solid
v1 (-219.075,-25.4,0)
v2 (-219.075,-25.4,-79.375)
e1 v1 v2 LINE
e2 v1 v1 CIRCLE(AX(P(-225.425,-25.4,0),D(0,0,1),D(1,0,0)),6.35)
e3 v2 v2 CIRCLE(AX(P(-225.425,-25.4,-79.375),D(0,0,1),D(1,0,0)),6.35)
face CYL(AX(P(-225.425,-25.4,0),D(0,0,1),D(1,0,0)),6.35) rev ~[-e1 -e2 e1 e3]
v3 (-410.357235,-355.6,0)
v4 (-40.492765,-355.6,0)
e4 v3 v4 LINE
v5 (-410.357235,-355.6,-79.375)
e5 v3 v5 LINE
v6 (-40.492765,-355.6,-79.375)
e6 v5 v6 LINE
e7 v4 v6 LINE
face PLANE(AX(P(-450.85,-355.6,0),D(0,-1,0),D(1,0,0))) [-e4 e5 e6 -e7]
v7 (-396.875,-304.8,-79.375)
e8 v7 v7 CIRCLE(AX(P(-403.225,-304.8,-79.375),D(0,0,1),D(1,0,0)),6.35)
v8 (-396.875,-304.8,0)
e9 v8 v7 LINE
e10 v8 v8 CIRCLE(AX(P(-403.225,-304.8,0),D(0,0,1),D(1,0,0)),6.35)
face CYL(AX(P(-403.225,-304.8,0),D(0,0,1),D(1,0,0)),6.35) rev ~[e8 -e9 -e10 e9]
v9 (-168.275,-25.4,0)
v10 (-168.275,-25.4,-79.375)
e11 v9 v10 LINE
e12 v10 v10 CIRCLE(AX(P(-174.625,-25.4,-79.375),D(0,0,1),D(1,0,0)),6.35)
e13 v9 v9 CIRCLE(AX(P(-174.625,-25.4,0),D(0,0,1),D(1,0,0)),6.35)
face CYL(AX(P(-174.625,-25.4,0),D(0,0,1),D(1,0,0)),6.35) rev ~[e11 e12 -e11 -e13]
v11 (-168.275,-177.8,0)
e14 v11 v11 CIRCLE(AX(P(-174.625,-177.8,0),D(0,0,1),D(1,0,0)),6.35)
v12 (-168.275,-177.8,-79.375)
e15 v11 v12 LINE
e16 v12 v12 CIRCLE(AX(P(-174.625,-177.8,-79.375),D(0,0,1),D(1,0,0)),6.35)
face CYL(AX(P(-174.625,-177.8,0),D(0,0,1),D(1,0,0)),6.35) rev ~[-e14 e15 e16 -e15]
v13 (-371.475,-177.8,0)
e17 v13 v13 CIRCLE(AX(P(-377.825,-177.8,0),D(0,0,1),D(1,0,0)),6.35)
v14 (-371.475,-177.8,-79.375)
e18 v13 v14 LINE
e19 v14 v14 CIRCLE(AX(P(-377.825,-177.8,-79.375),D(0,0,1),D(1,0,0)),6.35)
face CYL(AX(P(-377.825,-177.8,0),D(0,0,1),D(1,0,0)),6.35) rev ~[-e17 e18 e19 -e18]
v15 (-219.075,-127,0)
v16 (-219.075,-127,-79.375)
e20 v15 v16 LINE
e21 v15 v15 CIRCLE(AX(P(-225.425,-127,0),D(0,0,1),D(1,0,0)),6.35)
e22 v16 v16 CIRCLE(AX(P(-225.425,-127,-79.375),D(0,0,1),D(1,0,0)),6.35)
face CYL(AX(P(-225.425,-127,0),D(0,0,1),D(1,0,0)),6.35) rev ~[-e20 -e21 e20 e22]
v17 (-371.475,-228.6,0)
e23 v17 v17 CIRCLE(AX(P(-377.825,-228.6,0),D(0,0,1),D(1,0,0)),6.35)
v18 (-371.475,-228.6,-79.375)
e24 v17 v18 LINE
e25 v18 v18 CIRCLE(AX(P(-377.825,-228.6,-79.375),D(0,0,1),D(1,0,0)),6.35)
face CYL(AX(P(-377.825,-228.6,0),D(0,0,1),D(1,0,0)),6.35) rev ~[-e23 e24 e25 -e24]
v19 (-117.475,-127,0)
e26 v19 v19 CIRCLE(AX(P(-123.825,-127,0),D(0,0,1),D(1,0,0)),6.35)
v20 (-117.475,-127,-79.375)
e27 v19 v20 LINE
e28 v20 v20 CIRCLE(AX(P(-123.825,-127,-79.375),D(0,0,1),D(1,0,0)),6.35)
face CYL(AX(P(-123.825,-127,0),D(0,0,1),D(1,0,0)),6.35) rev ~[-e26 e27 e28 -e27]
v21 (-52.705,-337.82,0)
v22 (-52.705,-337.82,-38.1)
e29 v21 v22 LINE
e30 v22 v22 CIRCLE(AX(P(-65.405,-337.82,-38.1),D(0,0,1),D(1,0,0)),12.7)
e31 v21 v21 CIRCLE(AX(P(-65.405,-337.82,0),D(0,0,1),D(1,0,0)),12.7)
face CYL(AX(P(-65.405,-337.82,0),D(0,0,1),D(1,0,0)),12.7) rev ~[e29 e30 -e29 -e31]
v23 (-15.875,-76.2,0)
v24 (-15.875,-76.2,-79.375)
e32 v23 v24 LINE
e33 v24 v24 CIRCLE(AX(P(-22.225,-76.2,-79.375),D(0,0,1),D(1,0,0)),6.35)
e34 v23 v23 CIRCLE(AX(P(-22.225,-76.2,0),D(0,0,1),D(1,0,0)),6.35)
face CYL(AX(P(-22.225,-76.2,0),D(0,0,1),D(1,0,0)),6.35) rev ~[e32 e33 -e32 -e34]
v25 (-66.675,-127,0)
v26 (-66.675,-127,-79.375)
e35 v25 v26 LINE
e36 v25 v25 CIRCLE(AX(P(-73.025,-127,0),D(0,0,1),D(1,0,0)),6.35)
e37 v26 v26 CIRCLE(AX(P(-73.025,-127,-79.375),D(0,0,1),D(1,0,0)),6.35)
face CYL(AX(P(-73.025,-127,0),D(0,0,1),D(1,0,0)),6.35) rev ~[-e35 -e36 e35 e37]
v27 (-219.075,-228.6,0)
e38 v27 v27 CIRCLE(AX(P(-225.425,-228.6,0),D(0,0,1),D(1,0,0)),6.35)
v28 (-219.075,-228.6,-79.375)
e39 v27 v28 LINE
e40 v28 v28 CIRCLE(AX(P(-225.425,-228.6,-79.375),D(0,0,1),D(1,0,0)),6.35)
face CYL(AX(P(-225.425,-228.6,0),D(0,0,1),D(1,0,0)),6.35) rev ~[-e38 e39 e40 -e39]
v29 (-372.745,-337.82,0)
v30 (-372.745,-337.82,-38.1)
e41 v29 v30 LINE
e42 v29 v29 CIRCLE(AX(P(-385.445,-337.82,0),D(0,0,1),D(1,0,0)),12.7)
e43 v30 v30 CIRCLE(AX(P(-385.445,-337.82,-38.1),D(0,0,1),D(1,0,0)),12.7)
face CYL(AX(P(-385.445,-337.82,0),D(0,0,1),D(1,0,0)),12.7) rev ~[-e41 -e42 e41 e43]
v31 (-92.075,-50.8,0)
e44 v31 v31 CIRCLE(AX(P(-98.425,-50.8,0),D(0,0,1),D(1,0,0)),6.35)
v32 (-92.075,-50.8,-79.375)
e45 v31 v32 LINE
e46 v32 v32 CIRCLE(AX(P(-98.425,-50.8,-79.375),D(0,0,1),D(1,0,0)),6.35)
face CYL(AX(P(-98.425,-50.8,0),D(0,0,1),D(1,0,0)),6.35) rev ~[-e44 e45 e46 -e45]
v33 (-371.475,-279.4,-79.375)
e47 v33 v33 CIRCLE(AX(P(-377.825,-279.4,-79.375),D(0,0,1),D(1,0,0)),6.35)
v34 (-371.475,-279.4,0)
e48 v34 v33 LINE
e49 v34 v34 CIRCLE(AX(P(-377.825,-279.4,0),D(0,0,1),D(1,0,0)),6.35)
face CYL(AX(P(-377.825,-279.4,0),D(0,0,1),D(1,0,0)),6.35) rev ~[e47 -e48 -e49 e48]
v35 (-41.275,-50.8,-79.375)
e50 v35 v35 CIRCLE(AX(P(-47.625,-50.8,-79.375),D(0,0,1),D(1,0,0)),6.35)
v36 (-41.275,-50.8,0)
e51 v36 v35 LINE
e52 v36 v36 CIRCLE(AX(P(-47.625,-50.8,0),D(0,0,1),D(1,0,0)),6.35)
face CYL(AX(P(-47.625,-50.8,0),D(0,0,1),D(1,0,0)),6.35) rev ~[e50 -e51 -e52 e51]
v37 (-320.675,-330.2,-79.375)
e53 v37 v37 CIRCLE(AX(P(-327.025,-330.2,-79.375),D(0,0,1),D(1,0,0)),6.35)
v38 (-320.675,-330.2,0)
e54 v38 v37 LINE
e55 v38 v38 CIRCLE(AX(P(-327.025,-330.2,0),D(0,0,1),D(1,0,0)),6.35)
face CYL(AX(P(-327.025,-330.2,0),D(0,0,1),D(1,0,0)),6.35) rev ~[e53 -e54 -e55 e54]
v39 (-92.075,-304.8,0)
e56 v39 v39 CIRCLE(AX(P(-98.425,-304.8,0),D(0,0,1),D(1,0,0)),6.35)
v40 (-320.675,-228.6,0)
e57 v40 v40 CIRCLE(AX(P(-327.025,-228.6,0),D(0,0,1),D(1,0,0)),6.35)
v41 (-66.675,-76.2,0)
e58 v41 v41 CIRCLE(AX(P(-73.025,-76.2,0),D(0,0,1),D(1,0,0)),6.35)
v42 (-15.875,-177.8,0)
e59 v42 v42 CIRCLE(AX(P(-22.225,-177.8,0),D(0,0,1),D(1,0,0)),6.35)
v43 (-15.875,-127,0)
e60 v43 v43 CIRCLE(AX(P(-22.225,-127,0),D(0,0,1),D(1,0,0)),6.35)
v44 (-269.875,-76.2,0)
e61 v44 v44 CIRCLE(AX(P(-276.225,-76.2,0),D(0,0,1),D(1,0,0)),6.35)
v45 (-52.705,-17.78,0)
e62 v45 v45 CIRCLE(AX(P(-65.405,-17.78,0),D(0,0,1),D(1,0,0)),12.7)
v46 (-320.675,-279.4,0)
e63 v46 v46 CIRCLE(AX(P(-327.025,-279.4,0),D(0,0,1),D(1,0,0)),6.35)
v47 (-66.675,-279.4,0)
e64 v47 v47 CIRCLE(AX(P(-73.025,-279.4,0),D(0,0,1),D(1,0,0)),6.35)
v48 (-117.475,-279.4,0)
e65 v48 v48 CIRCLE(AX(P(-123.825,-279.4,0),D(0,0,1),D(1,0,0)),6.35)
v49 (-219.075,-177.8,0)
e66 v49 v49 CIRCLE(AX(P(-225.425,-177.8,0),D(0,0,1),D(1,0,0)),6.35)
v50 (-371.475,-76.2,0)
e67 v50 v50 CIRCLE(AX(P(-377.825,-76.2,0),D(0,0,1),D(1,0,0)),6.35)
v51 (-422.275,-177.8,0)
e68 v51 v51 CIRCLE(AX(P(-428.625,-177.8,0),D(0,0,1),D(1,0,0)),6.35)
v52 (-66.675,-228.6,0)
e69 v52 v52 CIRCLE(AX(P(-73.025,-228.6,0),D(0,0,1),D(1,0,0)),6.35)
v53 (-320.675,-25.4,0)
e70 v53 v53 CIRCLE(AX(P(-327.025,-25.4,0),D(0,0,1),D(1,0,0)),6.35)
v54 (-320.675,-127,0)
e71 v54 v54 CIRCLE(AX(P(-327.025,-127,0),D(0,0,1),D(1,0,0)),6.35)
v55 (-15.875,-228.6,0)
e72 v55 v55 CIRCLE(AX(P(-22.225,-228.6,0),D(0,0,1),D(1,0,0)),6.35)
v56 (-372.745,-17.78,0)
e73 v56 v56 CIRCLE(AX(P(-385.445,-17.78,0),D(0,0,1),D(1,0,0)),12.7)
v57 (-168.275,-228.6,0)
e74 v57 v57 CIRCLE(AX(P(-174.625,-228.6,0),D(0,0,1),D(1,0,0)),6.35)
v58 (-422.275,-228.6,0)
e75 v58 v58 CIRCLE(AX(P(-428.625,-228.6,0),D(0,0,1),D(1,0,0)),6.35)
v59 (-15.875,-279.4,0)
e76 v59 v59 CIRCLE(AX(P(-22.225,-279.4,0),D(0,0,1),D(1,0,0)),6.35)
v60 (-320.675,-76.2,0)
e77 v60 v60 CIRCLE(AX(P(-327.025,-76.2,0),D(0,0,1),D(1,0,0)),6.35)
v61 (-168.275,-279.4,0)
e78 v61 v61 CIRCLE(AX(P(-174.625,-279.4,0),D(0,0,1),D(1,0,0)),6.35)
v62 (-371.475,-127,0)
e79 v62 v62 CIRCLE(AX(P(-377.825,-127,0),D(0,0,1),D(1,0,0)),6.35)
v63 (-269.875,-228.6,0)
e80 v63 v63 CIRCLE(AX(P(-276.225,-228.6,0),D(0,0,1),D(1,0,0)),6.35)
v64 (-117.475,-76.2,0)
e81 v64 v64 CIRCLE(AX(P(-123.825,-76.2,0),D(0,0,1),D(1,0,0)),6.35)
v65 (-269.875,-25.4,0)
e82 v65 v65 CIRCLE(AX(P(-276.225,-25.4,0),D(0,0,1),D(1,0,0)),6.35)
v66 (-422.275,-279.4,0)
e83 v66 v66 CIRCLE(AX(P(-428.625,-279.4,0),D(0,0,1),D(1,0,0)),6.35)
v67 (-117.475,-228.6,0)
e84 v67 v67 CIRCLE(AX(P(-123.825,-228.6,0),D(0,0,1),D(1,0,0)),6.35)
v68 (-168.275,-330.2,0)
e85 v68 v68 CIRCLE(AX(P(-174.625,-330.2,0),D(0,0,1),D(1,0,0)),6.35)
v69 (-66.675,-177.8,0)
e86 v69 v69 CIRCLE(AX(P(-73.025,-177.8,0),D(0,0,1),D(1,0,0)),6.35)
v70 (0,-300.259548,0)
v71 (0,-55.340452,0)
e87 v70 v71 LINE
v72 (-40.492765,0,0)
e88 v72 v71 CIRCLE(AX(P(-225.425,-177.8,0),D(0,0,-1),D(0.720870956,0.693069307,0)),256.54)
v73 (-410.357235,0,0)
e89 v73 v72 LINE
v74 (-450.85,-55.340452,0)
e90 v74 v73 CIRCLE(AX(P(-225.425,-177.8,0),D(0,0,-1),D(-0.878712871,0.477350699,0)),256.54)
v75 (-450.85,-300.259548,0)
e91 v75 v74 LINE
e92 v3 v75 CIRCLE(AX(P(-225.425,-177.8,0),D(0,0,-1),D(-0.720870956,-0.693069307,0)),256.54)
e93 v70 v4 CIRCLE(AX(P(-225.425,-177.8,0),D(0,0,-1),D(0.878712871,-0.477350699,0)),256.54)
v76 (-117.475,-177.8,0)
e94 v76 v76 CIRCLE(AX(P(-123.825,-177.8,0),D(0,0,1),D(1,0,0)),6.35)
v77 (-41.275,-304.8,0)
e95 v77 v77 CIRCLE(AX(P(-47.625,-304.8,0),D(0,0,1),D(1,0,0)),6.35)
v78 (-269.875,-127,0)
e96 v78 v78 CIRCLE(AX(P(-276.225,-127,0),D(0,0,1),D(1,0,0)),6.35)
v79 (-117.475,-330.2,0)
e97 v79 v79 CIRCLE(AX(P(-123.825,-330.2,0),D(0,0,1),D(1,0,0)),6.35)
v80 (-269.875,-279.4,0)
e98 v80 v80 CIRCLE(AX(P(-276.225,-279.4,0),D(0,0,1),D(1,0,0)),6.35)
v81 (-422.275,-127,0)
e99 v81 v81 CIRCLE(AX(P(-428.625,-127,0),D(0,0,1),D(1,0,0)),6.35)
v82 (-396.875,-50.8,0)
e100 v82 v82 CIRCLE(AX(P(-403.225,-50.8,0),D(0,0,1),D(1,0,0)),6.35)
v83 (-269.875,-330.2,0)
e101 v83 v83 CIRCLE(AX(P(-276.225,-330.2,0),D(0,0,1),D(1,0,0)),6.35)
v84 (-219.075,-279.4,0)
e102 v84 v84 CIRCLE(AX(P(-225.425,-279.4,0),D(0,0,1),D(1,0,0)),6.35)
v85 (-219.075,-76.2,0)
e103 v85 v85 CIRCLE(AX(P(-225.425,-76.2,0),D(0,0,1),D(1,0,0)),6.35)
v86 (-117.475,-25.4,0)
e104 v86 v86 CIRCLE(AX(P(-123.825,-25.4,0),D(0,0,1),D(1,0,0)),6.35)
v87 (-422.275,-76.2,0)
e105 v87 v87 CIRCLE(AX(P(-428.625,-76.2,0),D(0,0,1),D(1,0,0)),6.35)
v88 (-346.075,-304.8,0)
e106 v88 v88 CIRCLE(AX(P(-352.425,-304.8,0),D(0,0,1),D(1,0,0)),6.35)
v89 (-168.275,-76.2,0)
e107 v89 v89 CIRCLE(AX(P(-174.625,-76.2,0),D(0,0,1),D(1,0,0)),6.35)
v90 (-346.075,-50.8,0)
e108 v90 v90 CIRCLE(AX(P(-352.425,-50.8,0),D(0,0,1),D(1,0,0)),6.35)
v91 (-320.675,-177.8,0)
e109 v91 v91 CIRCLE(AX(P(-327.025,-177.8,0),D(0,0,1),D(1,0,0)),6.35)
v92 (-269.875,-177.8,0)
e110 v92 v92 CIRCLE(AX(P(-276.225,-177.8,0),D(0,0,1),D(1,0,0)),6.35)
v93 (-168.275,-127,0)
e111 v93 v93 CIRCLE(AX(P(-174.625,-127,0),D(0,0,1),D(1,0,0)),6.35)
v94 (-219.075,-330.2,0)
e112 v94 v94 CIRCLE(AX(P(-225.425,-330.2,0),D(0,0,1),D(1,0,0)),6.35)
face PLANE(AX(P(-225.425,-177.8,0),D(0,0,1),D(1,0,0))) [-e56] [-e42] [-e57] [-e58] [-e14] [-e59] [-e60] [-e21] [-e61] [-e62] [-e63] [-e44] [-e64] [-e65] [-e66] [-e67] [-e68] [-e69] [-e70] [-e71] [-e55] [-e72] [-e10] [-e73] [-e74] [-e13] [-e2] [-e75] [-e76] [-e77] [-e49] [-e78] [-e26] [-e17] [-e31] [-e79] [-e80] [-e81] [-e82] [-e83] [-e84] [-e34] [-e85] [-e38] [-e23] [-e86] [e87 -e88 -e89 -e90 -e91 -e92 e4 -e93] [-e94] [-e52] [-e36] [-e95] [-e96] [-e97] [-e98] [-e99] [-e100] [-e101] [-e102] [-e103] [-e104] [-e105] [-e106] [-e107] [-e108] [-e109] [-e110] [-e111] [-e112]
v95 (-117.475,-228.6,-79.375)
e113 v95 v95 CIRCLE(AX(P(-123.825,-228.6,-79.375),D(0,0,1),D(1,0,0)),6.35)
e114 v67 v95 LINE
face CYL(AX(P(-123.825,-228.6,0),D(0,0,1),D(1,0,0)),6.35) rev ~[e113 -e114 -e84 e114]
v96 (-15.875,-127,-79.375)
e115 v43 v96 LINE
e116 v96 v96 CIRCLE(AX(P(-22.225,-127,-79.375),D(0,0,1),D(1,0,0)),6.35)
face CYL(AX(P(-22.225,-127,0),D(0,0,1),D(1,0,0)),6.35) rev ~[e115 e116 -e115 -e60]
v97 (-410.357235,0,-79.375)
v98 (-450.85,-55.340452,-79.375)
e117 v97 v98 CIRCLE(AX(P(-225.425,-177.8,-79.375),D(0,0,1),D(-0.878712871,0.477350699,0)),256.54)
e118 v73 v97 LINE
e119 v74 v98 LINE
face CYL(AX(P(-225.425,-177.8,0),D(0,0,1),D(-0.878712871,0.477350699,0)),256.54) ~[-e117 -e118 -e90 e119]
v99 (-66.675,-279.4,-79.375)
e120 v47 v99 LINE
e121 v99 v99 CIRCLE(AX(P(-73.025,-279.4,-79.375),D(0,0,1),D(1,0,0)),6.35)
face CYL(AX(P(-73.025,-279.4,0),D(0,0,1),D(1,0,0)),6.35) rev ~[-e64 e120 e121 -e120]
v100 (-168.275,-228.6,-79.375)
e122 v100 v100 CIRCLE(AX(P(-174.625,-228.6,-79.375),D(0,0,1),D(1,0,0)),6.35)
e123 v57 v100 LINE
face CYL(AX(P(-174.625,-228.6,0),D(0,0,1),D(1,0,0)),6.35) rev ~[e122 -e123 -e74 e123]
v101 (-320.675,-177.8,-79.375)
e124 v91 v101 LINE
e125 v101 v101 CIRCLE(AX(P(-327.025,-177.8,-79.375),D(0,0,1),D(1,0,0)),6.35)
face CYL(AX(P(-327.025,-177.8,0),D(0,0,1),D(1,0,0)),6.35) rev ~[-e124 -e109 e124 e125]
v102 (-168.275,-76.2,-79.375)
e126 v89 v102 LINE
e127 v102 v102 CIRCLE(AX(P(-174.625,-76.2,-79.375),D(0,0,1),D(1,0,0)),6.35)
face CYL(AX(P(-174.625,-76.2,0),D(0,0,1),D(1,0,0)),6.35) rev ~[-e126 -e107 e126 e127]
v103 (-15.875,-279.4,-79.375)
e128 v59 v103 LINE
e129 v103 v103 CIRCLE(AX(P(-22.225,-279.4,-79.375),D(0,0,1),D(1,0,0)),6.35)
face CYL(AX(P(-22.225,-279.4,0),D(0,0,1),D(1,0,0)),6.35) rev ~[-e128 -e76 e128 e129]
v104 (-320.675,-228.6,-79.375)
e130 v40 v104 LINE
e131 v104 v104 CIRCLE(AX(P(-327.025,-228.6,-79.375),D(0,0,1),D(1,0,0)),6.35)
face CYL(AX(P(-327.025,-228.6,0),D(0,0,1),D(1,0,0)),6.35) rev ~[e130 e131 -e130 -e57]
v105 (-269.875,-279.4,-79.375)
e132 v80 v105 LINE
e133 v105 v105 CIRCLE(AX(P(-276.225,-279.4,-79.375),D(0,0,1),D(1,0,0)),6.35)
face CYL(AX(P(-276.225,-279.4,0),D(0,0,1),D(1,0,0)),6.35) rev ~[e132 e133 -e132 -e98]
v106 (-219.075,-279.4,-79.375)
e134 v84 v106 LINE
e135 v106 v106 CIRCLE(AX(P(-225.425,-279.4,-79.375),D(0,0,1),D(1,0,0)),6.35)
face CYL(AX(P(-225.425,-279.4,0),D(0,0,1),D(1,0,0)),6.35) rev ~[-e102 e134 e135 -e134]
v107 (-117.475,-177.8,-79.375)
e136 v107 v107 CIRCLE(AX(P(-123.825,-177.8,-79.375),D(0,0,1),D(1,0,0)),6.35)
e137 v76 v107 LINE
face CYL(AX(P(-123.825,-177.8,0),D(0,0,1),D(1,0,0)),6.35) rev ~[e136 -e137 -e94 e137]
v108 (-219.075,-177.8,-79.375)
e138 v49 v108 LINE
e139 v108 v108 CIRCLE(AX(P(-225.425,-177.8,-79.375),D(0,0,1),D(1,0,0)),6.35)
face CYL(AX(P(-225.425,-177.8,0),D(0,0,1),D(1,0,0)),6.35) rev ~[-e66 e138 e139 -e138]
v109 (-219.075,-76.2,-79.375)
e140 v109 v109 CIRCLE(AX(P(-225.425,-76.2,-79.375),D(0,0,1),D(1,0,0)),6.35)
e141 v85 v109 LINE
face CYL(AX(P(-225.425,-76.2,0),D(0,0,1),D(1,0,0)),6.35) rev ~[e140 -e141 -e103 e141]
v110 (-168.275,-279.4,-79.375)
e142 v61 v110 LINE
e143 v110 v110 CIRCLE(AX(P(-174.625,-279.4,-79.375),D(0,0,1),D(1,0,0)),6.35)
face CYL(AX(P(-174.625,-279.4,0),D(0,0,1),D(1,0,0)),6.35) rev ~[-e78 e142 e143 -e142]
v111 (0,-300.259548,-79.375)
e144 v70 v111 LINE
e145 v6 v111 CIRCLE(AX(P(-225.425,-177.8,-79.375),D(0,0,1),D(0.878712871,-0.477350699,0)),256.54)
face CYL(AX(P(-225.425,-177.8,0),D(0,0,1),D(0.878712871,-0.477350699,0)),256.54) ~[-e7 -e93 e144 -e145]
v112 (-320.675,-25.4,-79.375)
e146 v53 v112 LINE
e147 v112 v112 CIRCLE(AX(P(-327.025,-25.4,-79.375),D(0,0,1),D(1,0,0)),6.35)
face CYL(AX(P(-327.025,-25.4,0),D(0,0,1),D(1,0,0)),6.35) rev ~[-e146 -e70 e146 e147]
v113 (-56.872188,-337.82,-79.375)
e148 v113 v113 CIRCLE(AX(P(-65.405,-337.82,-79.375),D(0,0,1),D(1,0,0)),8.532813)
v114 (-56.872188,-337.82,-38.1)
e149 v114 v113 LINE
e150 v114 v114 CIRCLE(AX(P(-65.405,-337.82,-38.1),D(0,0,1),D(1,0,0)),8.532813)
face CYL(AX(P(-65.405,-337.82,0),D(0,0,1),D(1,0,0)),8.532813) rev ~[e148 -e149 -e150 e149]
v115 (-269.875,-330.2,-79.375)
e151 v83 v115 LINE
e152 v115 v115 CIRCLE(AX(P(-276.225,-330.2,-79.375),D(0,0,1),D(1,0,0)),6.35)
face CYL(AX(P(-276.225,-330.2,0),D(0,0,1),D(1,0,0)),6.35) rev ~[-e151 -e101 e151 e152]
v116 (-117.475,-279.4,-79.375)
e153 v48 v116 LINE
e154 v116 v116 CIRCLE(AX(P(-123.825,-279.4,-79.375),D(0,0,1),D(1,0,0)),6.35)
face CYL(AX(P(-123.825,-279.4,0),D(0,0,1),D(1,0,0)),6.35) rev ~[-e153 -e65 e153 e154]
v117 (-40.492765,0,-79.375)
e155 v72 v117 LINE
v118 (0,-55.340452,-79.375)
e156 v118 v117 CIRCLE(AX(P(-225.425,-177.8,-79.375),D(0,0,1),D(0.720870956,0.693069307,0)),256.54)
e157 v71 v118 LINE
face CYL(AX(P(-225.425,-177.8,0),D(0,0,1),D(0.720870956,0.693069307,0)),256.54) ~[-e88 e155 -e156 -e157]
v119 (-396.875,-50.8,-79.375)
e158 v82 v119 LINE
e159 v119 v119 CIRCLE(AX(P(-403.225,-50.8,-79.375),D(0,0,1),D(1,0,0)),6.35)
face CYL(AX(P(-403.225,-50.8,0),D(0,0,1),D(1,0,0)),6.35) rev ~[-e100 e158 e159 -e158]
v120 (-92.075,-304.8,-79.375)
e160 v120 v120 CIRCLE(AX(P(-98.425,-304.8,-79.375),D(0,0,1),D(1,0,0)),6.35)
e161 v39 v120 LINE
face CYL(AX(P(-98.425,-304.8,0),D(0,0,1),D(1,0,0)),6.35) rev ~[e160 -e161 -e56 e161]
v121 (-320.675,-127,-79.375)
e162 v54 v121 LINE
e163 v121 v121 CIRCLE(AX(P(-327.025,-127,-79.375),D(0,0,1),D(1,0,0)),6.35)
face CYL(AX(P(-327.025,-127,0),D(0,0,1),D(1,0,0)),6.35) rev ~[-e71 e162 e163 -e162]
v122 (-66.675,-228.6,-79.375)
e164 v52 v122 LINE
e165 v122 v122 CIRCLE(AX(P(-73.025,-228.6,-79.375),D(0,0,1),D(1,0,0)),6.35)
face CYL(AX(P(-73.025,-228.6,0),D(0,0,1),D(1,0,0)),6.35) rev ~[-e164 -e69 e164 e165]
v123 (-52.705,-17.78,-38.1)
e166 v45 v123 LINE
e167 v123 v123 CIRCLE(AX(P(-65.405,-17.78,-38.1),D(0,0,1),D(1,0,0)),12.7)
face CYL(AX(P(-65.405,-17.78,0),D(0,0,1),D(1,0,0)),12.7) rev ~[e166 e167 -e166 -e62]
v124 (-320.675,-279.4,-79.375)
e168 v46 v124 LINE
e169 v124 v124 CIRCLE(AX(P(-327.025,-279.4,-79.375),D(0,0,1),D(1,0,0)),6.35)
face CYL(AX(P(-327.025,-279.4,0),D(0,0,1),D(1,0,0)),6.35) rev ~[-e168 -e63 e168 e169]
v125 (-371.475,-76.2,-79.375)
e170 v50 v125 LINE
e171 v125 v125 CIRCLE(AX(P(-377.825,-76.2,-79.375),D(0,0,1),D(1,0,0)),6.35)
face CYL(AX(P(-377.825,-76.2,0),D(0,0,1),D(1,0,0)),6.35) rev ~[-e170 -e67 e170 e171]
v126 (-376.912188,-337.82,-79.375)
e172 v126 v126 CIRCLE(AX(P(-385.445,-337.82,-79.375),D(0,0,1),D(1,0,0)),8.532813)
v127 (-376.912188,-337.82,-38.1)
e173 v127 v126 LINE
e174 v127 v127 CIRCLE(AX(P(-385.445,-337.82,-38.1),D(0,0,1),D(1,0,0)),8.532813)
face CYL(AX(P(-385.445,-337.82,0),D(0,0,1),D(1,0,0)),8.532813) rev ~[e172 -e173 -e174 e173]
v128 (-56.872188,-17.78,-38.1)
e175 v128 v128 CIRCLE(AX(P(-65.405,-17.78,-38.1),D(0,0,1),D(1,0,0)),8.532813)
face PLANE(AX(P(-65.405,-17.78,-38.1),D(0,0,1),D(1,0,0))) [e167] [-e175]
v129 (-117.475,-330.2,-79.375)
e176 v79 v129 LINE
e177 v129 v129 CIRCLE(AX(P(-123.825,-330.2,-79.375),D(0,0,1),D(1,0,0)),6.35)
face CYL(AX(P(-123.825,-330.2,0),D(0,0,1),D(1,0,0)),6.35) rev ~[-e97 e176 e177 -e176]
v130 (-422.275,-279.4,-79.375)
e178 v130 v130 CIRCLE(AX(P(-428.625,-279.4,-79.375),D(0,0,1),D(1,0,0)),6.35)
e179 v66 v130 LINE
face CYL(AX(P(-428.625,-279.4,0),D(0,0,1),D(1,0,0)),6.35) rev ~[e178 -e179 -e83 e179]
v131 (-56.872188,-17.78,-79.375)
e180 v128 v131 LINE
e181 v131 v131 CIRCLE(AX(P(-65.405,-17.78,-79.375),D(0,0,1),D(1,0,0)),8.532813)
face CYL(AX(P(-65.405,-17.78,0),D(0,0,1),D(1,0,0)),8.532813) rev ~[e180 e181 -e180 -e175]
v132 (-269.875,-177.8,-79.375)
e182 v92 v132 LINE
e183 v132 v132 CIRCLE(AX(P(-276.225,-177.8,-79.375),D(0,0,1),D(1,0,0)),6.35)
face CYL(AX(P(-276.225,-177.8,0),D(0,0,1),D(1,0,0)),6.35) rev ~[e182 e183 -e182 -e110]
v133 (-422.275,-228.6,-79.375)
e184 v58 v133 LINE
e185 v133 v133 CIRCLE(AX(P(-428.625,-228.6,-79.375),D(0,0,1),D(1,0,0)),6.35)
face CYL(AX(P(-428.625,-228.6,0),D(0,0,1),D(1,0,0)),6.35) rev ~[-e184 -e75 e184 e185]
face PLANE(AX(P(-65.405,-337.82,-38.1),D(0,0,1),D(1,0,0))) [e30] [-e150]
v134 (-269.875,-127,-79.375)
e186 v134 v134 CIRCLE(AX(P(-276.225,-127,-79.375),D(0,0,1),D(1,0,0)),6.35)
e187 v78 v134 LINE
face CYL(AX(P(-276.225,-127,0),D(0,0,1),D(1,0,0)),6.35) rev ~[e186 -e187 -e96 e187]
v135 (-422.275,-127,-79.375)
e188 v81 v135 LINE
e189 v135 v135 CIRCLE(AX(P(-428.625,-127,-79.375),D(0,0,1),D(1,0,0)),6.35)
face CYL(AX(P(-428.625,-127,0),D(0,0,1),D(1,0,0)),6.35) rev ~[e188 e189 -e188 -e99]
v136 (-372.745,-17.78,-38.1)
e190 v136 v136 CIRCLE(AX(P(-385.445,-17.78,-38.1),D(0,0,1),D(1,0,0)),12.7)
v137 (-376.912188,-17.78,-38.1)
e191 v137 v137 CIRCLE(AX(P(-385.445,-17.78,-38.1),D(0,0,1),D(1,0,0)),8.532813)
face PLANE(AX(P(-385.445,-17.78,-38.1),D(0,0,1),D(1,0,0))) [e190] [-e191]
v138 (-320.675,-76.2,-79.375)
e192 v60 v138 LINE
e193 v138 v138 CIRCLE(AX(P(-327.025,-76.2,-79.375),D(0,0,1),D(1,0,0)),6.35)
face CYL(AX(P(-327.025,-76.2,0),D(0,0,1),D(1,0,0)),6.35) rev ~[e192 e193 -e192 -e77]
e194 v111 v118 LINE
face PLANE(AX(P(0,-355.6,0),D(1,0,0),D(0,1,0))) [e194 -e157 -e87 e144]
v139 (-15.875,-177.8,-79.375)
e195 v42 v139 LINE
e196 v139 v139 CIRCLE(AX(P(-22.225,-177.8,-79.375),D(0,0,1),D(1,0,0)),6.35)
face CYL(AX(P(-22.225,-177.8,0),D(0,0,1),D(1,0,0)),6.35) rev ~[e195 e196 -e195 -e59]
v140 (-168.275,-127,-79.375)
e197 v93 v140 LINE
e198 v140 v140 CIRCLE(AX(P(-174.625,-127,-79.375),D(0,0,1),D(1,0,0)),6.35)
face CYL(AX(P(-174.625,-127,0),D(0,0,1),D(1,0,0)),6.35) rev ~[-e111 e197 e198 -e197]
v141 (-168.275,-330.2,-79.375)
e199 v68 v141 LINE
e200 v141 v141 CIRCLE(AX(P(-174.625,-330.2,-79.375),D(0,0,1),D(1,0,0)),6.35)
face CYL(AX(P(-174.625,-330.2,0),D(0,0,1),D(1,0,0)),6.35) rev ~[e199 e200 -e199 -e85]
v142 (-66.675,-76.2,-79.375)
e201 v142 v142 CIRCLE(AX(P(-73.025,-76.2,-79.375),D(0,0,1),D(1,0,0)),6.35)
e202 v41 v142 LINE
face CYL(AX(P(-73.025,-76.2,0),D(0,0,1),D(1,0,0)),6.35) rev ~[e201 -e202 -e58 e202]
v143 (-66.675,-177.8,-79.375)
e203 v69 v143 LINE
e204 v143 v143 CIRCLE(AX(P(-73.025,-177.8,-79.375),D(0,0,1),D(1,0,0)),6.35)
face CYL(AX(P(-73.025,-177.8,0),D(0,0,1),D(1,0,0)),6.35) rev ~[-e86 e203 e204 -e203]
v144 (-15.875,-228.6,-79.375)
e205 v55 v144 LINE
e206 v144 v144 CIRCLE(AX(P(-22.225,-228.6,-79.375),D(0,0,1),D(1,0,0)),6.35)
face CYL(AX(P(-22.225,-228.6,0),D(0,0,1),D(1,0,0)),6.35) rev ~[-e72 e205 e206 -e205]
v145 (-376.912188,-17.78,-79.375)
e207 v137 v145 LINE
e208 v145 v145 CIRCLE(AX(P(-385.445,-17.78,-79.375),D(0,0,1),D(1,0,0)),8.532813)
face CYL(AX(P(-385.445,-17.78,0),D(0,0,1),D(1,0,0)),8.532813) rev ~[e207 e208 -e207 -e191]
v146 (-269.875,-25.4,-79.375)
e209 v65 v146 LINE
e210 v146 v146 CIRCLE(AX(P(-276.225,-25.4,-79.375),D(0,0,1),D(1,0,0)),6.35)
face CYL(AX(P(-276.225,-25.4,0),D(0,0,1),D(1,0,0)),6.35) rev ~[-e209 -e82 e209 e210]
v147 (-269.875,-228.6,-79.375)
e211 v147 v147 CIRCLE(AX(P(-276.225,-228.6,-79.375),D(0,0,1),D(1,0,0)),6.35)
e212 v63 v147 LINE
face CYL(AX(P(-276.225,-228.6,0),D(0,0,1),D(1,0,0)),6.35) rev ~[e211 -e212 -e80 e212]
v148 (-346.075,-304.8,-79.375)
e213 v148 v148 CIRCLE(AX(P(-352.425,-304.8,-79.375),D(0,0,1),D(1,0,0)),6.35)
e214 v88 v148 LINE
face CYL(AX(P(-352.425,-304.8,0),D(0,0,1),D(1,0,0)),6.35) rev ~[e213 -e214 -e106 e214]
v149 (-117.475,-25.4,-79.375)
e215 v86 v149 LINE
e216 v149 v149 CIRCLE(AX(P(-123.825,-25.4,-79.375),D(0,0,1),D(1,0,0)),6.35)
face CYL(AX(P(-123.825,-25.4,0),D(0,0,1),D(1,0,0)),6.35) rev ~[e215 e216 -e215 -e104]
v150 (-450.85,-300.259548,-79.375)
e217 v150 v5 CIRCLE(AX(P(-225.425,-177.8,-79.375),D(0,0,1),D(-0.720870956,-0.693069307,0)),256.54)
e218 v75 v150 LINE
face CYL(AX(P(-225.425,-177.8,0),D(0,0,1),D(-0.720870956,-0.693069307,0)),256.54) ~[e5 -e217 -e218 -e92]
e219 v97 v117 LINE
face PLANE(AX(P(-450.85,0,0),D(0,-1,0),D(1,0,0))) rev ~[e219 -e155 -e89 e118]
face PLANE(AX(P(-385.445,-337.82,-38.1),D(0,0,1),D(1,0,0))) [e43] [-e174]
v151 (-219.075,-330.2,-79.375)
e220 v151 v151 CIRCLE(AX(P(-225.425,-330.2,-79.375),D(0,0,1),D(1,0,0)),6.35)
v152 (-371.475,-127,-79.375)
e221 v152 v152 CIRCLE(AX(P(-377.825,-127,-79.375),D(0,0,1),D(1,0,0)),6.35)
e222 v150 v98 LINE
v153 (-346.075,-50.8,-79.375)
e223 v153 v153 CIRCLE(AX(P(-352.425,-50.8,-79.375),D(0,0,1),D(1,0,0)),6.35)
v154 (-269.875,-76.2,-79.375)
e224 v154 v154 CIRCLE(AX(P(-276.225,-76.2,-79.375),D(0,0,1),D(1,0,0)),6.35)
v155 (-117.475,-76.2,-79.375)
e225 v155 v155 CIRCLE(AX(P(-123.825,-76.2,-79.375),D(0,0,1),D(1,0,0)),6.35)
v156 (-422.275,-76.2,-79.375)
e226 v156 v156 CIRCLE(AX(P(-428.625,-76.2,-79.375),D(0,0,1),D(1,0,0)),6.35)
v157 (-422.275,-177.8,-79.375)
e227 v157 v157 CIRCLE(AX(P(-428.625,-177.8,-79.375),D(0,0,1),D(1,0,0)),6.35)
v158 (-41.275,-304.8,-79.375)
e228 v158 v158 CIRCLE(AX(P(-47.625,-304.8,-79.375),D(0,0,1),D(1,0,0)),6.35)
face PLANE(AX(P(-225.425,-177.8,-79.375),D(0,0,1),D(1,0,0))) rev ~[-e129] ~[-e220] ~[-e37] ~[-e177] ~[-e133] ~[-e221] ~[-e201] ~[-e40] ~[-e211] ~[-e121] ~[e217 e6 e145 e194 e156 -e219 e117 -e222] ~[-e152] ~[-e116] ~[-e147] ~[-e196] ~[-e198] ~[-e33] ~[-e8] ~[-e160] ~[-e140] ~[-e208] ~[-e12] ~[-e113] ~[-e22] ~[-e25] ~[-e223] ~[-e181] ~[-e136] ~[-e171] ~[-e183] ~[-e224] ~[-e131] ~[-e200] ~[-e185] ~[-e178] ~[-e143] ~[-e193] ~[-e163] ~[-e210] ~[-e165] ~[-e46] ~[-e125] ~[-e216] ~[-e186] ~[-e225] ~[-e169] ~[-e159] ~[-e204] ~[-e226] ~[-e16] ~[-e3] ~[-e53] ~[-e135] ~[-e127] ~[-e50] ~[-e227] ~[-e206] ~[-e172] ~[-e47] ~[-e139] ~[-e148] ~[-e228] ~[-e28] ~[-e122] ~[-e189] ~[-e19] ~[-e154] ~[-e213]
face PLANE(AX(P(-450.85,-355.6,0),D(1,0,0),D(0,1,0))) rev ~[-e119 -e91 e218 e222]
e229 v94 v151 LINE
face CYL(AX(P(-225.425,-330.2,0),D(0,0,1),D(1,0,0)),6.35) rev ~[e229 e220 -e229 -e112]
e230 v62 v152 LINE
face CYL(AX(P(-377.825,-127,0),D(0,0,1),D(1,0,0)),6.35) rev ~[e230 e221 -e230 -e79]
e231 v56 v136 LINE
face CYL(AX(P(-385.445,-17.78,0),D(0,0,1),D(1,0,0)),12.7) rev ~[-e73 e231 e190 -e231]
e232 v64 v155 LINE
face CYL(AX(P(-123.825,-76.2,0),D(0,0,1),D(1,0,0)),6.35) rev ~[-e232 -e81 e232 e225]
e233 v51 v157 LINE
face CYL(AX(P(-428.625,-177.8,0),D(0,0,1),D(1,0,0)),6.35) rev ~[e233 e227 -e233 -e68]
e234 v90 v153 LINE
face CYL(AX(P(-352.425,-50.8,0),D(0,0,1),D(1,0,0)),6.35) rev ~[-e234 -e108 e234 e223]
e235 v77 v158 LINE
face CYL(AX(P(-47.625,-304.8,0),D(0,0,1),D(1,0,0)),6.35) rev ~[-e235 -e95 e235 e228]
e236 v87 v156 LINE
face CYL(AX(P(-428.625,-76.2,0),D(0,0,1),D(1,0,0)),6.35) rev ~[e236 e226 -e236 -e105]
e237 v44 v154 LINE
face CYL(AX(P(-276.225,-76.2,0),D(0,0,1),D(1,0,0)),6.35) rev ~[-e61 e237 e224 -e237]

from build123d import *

# Parameters (mm, degrees)
F0_W      = 450.85
F0_H      = 355.6
F1_DEPTH  = 79.375
F3_DEPTH  = 79.376
F4_R      = 12.7
F4_R_2    = 8.5328125
F5_DEPTH  = 38.1
F6_DEPTH  = 79.376
F7_R      = 6.35
F8_DEPTH  = 79.376
F9_R      = 6.35
F10_DEPTH = 79.376


with BuildPart() as f1:
    # F0 (on Top) → F1 (new body)
    with BuildSketch(Plane.XY):
        with Locations((-225.425, -177.8)):
            Rectangle(F0_W, F0_H)
    extrude(amount=-F1_DEPTH)

    # F2 (on face) → F3 (cut, through all)
    with BuildSketch(Plane.XY):
        with BuildLine():
            ThreePointArc((-40.4927648434, 0), (-18.3889970697, -26.3111717299), (0, -55.3404516789))
            Line((0, -55.3404516789), (0, 0))
            Line((0, 0), (-40.4927648434, 0))
        make_face()
        with BuildLine():
            Line((0, -355.6), (0, -300.2595483211))
            ThreePointArc((0, -300.2595483211), (-18.3889970697, -329.2888282701), (-40.4927648434, -355.6))
            Line((-40.4927648434, -355.6), (0, -355.6))
        make_face()
        with BuildLine():
            ThreePointArc((-410.3572351566, -355.6), (-225.425, -434.34), (-40.4927648434, -355.6))
            Line((-40.4927648434, -355.6), (-410.3572351566, -355.6))
        make_face()
        with BuildLine():
            ThreePointArc((-450.85, -55.3404516789), (-432.4610029303, -26.3111717299), (-410.3572351566, 0))
            Line((-410.3572351566, 0), (-450.85, 0))
            Line((-450.85, 0), (-450.85, -55.3404516789))
        make_face()
        with BuildLine():
            Line((-450.85, -355.6), (-410.3572351566, -355.6))
            ThreePointArc((-410.3572351566, -355.6), (-432.4610029303, -329.2888282701), (-450.85, -300.2595483211))
            Line((-450.85, -300.2595483211), (-450.85, -355.6))
        make_face()
    extrude(amount=-F3_DEPTH, mode=Mode.SUBTRACT)

    # F4 (on face) → F5 (cut)
    with BuildSketch(Plane.XY):
        with Locations((-385.445, -337.82)):
            Circle(F4_R)
        with Locations((-385.445, -337.82)):
            Circle(F4_R_2, mode=Mode.SUBTRACT)
        with Locations((-65.405, -17.78)):
            Circle(F4_R)
        with Locations((-65.405, -17.78)):
            Circle(F4_R_2, mode=Mode.SUBTRACT)
        with Locations((-65.405, -337.82)):
            Circle(F4_R)
        with Locations((-65.405, -337.82)):
            Circle(F4_R_2, mode=Mode.SUBTRACT)
        with Locations((-385.445, -17.78)):
            Circle(F4_R)
        with Locations((-385.445, -17.78)):
            Circle(F4_R_2, mode=Mode.SUBTRACT)
    extrude(amount=-F5_DEPTH, mode=Mode.SUBTRACT)

    # F4 (on face) → F6 (cut, through all)
    with BuildSketch(Plane.XY):
        with Locations((-385.445, -337.82)):
            Circle(F4_R_2)
        with Locations((-65.405, -337.82)):
            Circle(F4_R_2)
        with Locations((-65.405, -17.78)):
            Circle(F4_R_2)
        with Locations((-385.445, -17.78)):
            Circle(F4_R_2)
    extrude(amount=-F6_DEPTH, mode=Mode.SUBTRACT)

    # F7 (on face) → F8 (cut, through all)
    with BuildSketch(Plane.XY):
        with Locations((-377.825, -76.2)):
            Circle(F7_R)
        with Locations((-428.625, -76.2)):
            Circle(F7_R)
        with Locations((-327.025, -25.4)):
            Circle(F7_R)
        with Locations((-276.225, -25.4)):
            Circle(F7_R)
        with Locations((-225.425, -25.4)):
            Circle(F7_R)
        with Locations((-174.625, -25.4)):
            Circle(F7_R)
        with Locations((-123.825, -25.4)):
            Circle(F7_R)
        with Locations((-73.025, -76.2)):
            Circle(F7_R)
        with Locations((-123.825, -127)):
            Circle(F7_R)
        with Locations((-73.025, -127)):
            Circle(F7_R)
        with Locations((-22.225, -127)):
            Circle(F7_R)
        with Locations((-22.225, -76.2)):
            Circle(F7_R)
        with Locations((-123.825, -76.2)):
            Circle(F7_R)
        with Locations((-174.625, -76.2)):
            Circle(F7_R)
        with Locations((-225.425, -76.2)):
            Circle(F7_R)
        with Locations((-276.225, -76.2)):
            Circle(F7_R)
        with Locations((-327.025, -76.2)):
            Circle(F7_R)
        with Locations((-428.625, -127)):
            Circle(F7_R)
        with Locations((-327.025, -127)):
            Circle(F7_R)
        with Locations((-276.225, -127)):
            Circle(F7_R)
        with Locations((-225.425, -127)):
            Circle(F7_R)
        with Locations((-174.625, -127)):
            Circle(F7_R)
        with Locations((-225.425, -177.8)):
            Circle(F7_R)
        with Locations((-276.225, -177.8)):
            Circle(F7_R)
        with Locations((-327.025, -177.8)):
            Circle(F7_R)
        with Locations((-377.825, -177.8)):
            Circle(F7_R)
        with Locations((-428.625, -177.8)):
            Circle(F7_R)
        with Locations((-174.625, -177.8)):
            Circle(F7_R)
        with Locations((-73.025, -177.8)):
            Circle(F7_R)
        with Locations((-123.825, -177.8)):
            Circle(F7_R)
        with Locations((-22.225, -177.8)):
            Circle(F7_R)
        with Locations((-22.225, -228.6)):
            Circle(F7_R)
        with Locations((-123.825, -228.6)):
            Circle(F7_R)
        with Locations((-174.625, -228.6)):
            Circle(F7_R)
        with Locations((-73.025, -228.6)):
            Circle(F7_R)
        with Locations((-225.425, -228.6)):
            Circle(F7_R)
        with Locations((-276.225, -228.6)):
            Circle(F7_R)
        with Locations((-327.025, -228.6)):
            Circle(F7_R)
        with Locations((-377.825, -127)):
            Circle(F7_R)
        with Locations((-377.825, -228.6)):
            Circle(F7_R)
        with Locations((-428.625, -228.6)):
            Circle(F7_R)
        with Locations((-327.025, -279.4)):
            Circle(F7_R)
        with Locations((-377.825, -279.4)):
            Circle(F7_R)
        with Locations((-428.625, -279.4)):
            Circle(F7_R)
        with Locations((-276.225, -279.4)):
            Circle(F7_R)
        with Locations((-225.425, -279.4)):
            Circle(F7_R)
        with Locations((-22.225, -279.4)):
            Circle(F7_R)
        with Locations((-123.825, -330.2)):
            Circle(F7_R)
        with Locations((-174.625, -330.2)):
            Circle(F7_R)
        with Locations((-225.425, -330.2)):
            Circle(F7_R)
        with Locations((-174.625, -279.4)):
            Circle(F7_R)
        with Locations((-123.825, -279.4)):
            Circle(F7_R)
        with Locations((-73.025, -279.4)):
            Circle(F7_R)
        with Locations((-276.225, -330.2)):
            Circle(F7_R)
        with Locations((-327.025, -330.2)):
            Circle(F7_R)
    extrude(amount=-F8_DEPTH, mode=Mode.SUBTRACT)

    # F9 (on face) → F10 (cut, through all)
    with BuildSketch(Plane.XY):
        with Locations((-403.225, -304.8)):
            Circle(F9_R)
        with Locations((-352.425, -304.8)):
            Circle(F9_R)
        with Locations((-352.425, -50.8)):
            Circle(F9_R)
        with Locations((-403.225, -50.8)):
            Circle(F9_R)
        with Locations((-98.425, -50.8)):
            Circle(F9_R)
        with Locations((-47.625, -50.8)):
            Circle(F9_R)
        with Locations((-98.425, -304.8)):
            Circle(F9_R)
        with Locations((-47.625, -304.8)):
            Circle(F9_R)
    extrude(amount=-F10_DEPTH, mode=Mode.SUBTRACT)


solid = f1.part
